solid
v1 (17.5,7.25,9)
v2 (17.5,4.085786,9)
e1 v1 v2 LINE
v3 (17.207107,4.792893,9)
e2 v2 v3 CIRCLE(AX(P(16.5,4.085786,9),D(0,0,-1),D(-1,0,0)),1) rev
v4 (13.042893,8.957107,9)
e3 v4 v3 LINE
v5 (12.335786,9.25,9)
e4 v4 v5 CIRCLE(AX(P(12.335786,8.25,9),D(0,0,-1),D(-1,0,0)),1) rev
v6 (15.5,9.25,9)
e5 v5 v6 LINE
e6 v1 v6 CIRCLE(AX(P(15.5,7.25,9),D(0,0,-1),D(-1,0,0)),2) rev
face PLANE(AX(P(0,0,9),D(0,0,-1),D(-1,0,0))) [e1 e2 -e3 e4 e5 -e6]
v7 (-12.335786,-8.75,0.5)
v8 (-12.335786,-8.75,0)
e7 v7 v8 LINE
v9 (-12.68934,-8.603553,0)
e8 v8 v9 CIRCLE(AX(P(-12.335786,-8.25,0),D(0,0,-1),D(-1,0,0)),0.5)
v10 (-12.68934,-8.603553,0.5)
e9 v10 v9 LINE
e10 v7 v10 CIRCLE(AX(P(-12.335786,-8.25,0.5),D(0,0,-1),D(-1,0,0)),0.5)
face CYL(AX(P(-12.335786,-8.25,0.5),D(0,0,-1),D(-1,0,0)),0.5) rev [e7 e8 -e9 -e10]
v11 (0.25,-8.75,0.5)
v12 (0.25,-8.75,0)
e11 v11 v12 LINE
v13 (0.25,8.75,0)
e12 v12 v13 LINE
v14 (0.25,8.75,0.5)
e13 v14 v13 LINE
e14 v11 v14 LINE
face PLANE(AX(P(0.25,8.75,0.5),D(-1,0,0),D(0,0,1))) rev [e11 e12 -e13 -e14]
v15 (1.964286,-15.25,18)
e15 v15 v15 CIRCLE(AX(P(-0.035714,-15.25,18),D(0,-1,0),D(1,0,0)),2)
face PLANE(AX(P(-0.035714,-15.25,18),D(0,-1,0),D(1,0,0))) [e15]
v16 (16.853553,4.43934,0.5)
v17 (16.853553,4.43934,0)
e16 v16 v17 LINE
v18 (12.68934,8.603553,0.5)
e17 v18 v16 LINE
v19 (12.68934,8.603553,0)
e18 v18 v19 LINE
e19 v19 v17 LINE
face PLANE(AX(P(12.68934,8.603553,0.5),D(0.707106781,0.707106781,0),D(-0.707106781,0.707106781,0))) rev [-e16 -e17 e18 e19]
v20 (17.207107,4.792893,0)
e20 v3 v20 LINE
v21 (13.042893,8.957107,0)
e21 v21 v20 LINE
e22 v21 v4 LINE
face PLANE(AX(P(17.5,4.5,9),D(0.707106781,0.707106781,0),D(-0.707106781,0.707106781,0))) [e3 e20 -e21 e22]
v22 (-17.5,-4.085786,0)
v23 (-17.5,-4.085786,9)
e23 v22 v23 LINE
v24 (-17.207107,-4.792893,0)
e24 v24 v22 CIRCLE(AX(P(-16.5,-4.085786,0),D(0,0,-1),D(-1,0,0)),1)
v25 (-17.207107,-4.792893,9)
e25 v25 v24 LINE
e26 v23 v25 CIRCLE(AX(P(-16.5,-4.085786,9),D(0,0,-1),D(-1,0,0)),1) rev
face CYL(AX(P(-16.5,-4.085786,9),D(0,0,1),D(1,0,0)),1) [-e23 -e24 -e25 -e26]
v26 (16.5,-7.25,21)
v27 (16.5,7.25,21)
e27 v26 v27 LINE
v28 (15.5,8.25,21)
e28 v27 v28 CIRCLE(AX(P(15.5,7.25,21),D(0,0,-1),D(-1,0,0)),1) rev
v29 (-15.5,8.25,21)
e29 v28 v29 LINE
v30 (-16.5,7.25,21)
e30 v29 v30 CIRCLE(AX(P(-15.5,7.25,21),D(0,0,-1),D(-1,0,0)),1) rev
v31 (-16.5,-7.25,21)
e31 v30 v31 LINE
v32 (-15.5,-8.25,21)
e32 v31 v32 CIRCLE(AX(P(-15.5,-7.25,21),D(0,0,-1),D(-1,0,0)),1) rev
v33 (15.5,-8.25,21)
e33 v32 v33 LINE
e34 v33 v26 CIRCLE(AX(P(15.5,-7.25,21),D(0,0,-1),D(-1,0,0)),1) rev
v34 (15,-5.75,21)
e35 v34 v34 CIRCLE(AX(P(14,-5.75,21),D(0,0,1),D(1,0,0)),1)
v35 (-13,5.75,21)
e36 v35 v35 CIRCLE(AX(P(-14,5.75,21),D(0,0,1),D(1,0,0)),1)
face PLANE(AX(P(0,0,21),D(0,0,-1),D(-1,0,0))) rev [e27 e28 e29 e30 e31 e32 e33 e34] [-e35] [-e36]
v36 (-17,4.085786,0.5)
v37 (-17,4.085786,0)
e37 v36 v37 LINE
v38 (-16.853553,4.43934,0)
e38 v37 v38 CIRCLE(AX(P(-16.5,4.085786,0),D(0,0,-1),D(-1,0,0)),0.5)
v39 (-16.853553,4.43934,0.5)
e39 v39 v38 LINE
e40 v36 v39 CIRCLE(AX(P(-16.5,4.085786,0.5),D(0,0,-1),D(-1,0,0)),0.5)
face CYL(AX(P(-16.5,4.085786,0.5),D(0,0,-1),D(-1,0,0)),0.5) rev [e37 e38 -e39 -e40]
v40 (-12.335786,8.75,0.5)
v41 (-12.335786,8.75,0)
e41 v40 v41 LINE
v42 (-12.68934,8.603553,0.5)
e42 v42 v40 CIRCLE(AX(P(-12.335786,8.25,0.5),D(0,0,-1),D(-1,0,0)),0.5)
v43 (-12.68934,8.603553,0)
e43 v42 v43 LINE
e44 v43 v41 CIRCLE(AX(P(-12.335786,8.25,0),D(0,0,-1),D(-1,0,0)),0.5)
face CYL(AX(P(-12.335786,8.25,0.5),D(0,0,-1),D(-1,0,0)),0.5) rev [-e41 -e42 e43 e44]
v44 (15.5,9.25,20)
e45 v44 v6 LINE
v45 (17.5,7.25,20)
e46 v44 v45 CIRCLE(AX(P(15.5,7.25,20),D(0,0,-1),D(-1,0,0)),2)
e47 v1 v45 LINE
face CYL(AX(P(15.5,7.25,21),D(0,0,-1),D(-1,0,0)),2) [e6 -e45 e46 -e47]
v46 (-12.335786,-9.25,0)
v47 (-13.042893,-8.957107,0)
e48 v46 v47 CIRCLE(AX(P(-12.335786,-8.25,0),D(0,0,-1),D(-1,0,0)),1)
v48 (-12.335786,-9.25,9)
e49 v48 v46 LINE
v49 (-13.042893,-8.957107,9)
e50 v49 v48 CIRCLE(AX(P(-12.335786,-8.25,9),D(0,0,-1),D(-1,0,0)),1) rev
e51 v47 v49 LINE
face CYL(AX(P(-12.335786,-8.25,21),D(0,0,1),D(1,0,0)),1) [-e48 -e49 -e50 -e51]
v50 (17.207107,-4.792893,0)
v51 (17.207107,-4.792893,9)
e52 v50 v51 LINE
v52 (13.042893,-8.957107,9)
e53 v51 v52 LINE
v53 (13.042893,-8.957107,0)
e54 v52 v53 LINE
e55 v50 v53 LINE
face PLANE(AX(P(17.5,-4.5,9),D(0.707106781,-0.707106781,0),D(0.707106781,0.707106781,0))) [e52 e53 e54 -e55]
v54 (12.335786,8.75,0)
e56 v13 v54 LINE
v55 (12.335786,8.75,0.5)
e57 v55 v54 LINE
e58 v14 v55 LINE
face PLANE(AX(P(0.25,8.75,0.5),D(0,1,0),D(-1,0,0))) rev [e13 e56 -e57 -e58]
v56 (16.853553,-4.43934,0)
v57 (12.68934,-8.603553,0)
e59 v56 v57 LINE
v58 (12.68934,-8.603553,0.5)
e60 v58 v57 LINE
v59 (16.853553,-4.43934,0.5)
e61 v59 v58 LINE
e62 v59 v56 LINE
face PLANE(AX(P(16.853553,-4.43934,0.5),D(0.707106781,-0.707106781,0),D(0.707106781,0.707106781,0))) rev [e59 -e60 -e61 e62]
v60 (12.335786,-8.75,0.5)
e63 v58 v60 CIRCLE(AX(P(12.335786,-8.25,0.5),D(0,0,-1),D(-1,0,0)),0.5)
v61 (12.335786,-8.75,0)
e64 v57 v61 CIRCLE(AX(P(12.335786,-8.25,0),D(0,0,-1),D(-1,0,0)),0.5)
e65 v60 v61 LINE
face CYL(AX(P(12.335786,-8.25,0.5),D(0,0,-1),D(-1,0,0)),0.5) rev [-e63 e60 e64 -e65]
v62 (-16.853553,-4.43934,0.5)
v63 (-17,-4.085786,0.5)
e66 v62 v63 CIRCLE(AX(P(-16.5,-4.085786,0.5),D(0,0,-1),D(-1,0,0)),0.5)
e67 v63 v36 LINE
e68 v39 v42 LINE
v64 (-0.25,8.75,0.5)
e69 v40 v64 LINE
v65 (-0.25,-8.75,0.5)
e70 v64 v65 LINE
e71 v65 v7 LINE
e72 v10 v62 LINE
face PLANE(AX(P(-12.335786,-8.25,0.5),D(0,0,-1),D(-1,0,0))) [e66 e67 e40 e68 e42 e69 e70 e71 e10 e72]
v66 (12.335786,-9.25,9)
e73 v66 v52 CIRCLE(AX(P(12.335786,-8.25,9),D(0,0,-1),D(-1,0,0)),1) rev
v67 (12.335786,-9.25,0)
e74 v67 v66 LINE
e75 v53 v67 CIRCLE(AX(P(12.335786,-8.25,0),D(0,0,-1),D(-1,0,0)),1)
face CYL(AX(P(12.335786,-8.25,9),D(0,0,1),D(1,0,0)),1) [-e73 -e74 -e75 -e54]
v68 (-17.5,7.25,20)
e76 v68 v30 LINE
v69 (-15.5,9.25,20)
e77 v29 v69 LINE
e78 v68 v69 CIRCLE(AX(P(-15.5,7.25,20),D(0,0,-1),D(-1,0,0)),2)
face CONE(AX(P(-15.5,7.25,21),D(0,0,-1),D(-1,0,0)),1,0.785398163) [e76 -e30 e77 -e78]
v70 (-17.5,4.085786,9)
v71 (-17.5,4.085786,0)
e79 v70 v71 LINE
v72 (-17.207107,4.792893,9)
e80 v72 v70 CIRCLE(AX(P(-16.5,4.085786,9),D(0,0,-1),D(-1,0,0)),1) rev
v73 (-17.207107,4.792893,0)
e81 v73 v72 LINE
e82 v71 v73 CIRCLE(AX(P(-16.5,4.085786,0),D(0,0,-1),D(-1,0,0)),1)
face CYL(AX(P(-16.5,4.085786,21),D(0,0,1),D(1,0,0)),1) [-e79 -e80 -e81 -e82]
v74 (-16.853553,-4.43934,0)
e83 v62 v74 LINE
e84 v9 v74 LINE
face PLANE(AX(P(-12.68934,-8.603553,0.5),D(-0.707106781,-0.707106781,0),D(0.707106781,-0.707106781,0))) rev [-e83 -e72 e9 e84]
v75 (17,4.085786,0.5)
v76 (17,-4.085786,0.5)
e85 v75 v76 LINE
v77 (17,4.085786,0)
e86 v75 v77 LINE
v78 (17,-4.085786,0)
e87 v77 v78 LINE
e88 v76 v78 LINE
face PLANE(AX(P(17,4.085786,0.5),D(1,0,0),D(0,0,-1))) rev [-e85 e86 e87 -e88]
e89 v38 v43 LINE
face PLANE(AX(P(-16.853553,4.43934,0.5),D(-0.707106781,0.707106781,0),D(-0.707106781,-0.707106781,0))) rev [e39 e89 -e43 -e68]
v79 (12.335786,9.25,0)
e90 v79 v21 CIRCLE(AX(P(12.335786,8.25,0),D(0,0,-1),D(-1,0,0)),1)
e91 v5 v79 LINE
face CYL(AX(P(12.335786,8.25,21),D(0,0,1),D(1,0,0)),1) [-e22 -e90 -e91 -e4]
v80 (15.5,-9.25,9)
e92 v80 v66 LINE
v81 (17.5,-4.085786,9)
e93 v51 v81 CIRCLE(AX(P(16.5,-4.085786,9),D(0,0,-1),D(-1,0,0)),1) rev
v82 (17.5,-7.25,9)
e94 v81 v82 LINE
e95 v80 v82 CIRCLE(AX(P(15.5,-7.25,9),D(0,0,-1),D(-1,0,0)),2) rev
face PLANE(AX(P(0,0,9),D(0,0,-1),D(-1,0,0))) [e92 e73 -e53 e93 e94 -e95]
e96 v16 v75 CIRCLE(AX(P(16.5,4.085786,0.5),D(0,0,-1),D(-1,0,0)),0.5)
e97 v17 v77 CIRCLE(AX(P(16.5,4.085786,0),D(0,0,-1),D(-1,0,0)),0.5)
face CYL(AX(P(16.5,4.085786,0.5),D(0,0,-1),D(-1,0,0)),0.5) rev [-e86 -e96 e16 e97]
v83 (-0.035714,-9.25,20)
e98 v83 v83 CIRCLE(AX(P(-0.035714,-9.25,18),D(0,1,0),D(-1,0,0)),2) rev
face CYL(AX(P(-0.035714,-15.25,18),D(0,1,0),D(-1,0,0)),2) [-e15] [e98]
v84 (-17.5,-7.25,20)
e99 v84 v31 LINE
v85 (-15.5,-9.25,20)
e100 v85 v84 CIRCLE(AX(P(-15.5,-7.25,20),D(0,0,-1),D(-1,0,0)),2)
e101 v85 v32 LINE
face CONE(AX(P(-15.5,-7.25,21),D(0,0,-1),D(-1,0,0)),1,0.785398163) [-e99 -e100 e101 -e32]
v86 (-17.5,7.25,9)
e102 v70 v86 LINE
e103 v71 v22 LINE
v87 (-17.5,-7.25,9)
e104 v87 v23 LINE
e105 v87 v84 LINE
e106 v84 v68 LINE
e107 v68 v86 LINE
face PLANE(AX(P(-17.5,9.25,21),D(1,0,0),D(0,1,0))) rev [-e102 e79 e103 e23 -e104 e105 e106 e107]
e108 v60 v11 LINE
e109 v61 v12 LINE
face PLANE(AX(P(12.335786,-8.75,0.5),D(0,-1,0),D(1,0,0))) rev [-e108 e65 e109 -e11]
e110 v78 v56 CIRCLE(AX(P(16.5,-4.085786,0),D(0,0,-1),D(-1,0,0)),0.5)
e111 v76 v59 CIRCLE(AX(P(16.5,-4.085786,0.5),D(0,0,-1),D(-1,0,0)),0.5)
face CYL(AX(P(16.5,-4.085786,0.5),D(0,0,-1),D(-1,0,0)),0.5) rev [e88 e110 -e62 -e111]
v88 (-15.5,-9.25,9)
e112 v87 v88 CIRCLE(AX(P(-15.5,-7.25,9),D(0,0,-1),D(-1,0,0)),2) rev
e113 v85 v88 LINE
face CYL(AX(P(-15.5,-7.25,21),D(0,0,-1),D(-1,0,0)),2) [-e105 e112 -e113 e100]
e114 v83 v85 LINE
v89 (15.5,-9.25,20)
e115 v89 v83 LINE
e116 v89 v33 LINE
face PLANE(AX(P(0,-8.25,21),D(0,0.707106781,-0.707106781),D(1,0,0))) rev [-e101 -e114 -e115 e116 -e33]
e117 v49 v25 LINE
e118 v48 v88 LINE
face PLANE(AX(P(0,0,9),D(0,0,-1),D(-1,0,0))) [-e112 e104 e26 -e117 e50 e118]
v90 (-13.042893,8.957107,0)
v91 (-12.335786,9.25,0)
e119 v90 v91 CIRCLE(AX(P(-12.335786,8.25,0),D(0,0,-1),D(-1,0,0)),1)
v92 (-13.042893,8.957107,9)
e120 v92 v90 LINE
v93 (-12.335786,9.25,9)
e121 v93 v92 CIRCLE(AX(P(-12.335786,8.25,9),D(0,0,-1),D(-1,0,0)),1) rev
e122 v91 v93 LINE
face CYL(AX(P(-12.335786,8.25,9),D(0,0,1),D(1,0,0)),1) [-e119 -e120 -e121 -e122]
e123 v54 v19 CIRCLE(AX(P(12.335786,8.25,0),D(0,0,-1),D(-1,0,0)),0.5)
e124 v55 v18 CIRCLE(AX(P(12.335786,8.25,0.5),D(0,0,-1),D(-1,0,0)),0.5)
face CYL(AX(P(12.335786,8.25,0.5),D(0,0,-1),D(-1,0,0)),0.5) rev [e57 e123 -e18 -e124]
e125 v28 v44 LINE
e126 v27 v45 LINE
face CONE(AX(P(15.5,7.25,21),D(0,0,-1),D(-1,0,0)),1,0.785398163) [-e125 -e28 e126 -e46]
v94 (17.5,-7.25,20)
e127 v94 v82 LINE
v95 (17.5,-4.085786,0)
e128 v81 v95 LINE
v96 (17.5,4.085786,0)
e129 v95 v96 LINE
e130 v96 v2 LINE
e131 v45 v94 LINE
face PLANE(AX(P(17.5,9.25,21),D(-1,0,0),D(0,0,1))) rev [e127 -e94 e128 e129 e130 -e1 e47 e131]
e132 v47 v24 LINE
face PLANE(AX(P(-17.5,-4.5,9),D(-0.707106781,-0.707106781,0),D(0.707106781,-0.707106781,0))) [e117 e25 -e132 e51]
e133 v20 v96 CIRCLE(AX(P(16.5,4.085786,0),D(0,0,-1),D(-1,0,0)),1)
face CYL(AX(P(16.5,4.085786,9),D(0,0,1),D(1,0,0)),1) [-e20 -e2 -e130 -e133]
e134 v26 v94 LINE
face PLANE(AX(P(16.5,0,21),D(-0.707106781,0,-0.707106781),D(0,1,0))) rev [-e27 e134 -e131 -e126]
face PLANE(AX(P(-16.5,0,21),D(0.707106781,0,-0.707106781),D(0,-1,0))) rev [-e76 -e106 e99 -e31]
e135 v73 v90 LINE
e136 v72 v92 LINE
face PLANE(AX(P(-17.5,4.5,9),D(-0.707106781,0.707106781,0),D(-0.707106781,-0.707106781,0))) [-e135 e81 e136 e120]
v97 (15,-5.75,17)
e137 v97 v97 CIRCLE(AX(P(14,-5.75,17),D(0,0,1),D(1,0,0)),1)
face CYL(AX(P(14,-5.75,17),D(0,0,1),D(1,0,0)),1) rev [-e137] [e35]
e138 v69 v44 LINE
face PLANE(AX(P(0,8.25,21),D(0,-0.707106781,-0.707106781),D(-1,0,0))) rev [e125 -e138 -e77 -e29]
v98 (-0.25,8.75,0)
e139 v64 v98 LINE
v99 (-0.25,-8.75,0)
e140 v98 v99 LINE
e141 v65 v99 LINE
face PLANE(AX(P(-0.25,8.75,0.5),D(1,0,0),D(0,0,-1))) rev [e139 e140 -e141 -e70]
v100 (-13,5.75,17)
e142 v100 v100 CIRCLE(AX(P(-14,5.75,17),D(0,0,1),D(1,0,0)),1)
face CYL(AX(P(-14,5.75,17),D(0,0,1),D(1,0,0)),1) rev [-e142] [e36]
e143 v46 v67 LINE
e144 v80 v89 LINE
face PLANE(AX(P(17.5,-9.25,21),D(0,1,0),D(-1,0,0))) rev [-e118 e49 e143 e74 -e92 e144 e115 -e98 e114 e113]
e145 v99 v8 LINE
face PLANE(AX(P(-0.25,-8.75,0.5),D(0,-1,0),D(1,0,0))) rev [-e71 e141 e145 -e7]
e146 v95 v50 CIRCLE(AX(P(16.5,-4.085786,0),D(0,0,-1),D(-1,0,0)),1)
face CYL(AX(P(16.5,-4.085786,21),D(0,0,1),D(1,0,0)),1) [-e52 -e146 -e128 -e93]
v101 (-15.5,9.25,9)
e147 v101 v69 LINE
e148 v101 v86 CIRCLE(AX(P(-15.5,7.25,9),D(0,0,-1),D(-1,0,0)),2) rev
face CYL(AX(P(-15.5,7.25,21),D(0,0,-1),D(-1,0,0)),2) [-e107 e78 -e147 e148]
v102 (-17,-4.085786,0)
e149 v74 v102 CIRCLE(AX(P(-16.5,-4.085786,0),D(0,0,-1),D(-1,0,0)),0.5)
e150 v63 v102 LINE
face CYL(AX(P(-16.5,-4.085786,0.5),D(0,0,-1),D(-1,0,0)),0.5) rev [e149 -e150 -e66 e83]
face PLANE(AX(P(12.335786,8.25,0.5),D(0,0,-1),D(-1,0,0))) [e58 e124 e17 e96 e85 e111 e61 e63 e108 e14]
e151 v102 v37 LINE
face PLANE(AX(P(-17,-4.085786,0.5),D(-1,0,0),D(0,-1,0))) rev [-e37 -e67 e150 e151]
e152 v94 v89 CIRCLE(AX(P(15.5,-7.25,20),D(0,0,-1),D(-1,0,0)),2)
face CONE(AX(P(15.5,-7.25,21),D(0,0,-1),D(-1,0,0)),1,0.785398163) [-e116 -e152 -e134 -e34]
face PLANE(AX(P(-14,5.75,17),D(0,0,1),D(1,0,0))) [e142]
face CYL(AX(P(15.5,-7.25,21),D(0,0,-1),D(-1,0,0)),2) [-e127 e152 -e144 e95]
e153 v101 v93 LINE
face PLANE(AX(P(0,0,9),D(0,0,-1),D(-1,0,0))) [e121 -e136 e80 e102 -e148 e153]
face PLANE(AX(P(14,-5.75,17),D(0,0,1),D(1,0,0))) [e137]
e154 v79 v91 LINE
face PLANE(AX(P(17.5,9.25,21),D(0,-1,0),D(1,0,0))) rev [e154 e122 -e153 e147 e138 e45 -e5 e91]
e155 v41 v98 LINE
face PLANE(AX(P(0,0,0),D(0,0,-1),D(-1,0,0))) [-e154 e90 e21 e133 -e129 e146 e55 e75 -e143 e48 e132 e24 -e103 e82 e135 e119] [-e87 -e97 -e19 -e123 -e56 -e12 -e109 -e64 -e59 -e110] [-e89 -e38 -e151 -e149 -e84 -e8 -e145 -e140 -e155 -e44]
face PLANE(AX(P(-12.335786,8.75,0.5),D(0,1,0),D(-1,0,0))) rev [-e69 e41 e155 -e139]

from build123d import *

# Parameters (mm, degrees)
ESQUISSE1_W             = 35
ESQUISSE1_H             = 18.5
BOSS_EXTRU_1_DEPTH      = 21
CONG_1_R                = 2
ESQUISSE2_R             = 1
ENL_V_MAT_EXTRU_1_DEPTH = 4
ESQUISSE3_OUTSIDE_W     = 45.962
ESQUISSE3_OUTSIDE_H     = 29.462
ENL_V_MAT_EXTRU_2_DEPTH = 9
CONG_2_R                = 1
ENL_V_MAT_EXTRU_3_DEPTH = 0.5
ESQUISSE5_R             = 2
BOSS_EXTRU_2_DEPTH      = 6
CHANFREIN1_SIZE         = 1


with BuildPart() as part:
    # Esquisse1 → Boss.-Extru.1 (new body)
    with BuildSketch(Plane.XY):
        Rectangle(ESQUISSE1_W, ESQUISSE1_H)
    extrude(amount=BOSS_EXTRU_1_DEPTH)

    # Congé1
    cong_1_edges = [part.edges().sort_by_distance(p)[0] for p in [
        (-17.5, 9.25, 10.5),
        (17.5, 9.25, 10.5),
        (17.5, -9.25, 10.5),
        (-17.5, -9.25, 10.5),
    ]]
    fillet(cong_1_edges, radius=CONG_1_R)

    # Esquisse2 → Enlèv. mat.-Extru.1 (cut)
    with BuildSketch(Plane.XY.offset(21)):
        with Locations((-14, 5.75)):
            Circle(ESQUISSE2_R)
        with Locations((14, -5.75)):
            Circle(ESQUISSE2_R)
    extrude(amount=-ENL_V_MAT_EXTRU_1_DEPTH, mode=Mode.SUBTRACT)

    # Esquisse3 outside → Enlèv. mat.-Extru.2 (cut)
    with BuildSketch(Plane(origin=(0, 0, 0), x_dir=(-1, 0, 0), z_dir=(0, 0, -1))):
        Rectangle(ESQUISSE3_OUTSIDE_W, ESQUISSE3_OUTSIDE_H)
        Polygon((-17.5, 4.5), (-12.75, 9.25), (12.75, 9.25), (17.5, 4.5), (17.5, -4.5), (12.75, -9.25), (-12.75, -9.25), (-17.5, -4.5), align=None, mode=Mode.SUBTRACT)
    extrude(amount=-ENL_V_MAT_EXTRU_2_DEPTH, mode=Mode.SUBTRACT)

    # Congé2
    cong_2_edges = [part.edges().sort_by_distance(p)[0] for p in [
        (17.5, 4.5, 4.5),
        (12.75, 9.25, 4.5),
        (-12.75, 9.25, 4.5),
        (-17.5, 4.5, 4.5),
        (-17.5, -4.5, 4.5),
        (-12.75, -9.25, 4.5),
        (12.75, -9.25, 4.5),
        (17.5, -4.5, 4.5),
    ]]
    fillet(cong_2_edges, radius=CONG_2_R)

    # Esquisse4 → Enlèv. mat.-Extru.3 (cut)
    with BuildSketch(Plane(origin=(0, 0, 0), x_dir=(-1, 0, 0), z_dir=(0, 0, -1))):
        with BuildLine():
            Line((-0.25, 8.75), (-0.25, -8.75))
            Line((-0.25, -8.75), (-12.335786438, -8.75))
            ThreePointArc((-12.335786438, -8.75), (-12.527128154, -8.711939766), (-12.689339828, -8.603553391))
            Line((-12.689339828, -8.603553391), (-16.853553391, -4.439339828))
            ThreePointArc((-16.853553391, -4.439339828), (-16.961939766, -4.277128154), (-17, -4.085786438))
            Line((-17, -4.085786438), (-17, 4.085786438))
            ThreePointArc((-17, 4.085786438), (-16.961939766, 4.277128154), (-16.853553391, 4.439339828))
            Line((-16.853553391, 4.439339828), (-12.689339828, 8.603553391))
            ThreePointArc((-12.689339828, 8.603553391), (-12.527128154, 8.711939766), (-12.335786438, 8.75))
            Line((-12.335786438, 8.75), (-0.25, 8.75))
        make_face()
        with BuildLine():
            Line((0.25, 8.75), (0.25, -8.75))
            Line((0.25, -8.75), (12.335786438, -8.75))
            ThreePointArc((12.335786438, -8.75), (12.527128154, -8.711939766), (12.689339828, -8.603553391))
            Line((12.689339828, -8.603553391), (16.853553391, -4.439339828))
            ThreePointArc((16.853553391, -4.439339828), (16.961939766, -4.277128154), (17, -4.085786438))
            Line((17, -4.085786438), (17, 4.085786438))
            ThreePointArc((17, 4.085786438), (16.961939766, 4.277128154), (16.853553391, 4.439339828))
            Line((16.853553391, 4.439339828), (12.689339828, 8.603553391))
            ThreePointArc((12.689339828, 8.603553391), (12.527128154, 8.711939766), (12.335786438, 8.75))
            Line((12.335786438, 8.75), (0.25, 8.75))
        make_face()
    extrude(amount=-ENL_V_MAT_EXTRU_3_DEPTH, mode=Mode.SUBTRACT)

    # Esquisse5 → Boss.-Extru.2 (add)
    with BuildSketch(Plane.XZ.offset(9.25)):
        with Locations(Location((-0.035714286, 18, 0), (0, 0, 180))):
            Circle(ESQUISSE5_R)
    extrude(amount=BOSS_EXTRU_2_DEPTH)

    # Chanfrein1
    chanfrein1_edges = [part.edges().sort_by_distance(p)[0] for p in [
        (0, -9.25, 21),
        (-17.5, 0, 21),
        (17.5, 0, 21),
        (0, 9.25, 21),
        (16.914213562, 8.664213562, 21),
        (-16.914213562, 8.664213562, 21),
        (16.914213562, -8.664213562, 21),
        (-16.914213562, -8.664213562, 21),
    ]]
    chamfer(chanfrein1_edges, length=CHANFREIN1_SIZE - 0.0001)  # a hair under: the kernel refuses the full size


solid = part.part
